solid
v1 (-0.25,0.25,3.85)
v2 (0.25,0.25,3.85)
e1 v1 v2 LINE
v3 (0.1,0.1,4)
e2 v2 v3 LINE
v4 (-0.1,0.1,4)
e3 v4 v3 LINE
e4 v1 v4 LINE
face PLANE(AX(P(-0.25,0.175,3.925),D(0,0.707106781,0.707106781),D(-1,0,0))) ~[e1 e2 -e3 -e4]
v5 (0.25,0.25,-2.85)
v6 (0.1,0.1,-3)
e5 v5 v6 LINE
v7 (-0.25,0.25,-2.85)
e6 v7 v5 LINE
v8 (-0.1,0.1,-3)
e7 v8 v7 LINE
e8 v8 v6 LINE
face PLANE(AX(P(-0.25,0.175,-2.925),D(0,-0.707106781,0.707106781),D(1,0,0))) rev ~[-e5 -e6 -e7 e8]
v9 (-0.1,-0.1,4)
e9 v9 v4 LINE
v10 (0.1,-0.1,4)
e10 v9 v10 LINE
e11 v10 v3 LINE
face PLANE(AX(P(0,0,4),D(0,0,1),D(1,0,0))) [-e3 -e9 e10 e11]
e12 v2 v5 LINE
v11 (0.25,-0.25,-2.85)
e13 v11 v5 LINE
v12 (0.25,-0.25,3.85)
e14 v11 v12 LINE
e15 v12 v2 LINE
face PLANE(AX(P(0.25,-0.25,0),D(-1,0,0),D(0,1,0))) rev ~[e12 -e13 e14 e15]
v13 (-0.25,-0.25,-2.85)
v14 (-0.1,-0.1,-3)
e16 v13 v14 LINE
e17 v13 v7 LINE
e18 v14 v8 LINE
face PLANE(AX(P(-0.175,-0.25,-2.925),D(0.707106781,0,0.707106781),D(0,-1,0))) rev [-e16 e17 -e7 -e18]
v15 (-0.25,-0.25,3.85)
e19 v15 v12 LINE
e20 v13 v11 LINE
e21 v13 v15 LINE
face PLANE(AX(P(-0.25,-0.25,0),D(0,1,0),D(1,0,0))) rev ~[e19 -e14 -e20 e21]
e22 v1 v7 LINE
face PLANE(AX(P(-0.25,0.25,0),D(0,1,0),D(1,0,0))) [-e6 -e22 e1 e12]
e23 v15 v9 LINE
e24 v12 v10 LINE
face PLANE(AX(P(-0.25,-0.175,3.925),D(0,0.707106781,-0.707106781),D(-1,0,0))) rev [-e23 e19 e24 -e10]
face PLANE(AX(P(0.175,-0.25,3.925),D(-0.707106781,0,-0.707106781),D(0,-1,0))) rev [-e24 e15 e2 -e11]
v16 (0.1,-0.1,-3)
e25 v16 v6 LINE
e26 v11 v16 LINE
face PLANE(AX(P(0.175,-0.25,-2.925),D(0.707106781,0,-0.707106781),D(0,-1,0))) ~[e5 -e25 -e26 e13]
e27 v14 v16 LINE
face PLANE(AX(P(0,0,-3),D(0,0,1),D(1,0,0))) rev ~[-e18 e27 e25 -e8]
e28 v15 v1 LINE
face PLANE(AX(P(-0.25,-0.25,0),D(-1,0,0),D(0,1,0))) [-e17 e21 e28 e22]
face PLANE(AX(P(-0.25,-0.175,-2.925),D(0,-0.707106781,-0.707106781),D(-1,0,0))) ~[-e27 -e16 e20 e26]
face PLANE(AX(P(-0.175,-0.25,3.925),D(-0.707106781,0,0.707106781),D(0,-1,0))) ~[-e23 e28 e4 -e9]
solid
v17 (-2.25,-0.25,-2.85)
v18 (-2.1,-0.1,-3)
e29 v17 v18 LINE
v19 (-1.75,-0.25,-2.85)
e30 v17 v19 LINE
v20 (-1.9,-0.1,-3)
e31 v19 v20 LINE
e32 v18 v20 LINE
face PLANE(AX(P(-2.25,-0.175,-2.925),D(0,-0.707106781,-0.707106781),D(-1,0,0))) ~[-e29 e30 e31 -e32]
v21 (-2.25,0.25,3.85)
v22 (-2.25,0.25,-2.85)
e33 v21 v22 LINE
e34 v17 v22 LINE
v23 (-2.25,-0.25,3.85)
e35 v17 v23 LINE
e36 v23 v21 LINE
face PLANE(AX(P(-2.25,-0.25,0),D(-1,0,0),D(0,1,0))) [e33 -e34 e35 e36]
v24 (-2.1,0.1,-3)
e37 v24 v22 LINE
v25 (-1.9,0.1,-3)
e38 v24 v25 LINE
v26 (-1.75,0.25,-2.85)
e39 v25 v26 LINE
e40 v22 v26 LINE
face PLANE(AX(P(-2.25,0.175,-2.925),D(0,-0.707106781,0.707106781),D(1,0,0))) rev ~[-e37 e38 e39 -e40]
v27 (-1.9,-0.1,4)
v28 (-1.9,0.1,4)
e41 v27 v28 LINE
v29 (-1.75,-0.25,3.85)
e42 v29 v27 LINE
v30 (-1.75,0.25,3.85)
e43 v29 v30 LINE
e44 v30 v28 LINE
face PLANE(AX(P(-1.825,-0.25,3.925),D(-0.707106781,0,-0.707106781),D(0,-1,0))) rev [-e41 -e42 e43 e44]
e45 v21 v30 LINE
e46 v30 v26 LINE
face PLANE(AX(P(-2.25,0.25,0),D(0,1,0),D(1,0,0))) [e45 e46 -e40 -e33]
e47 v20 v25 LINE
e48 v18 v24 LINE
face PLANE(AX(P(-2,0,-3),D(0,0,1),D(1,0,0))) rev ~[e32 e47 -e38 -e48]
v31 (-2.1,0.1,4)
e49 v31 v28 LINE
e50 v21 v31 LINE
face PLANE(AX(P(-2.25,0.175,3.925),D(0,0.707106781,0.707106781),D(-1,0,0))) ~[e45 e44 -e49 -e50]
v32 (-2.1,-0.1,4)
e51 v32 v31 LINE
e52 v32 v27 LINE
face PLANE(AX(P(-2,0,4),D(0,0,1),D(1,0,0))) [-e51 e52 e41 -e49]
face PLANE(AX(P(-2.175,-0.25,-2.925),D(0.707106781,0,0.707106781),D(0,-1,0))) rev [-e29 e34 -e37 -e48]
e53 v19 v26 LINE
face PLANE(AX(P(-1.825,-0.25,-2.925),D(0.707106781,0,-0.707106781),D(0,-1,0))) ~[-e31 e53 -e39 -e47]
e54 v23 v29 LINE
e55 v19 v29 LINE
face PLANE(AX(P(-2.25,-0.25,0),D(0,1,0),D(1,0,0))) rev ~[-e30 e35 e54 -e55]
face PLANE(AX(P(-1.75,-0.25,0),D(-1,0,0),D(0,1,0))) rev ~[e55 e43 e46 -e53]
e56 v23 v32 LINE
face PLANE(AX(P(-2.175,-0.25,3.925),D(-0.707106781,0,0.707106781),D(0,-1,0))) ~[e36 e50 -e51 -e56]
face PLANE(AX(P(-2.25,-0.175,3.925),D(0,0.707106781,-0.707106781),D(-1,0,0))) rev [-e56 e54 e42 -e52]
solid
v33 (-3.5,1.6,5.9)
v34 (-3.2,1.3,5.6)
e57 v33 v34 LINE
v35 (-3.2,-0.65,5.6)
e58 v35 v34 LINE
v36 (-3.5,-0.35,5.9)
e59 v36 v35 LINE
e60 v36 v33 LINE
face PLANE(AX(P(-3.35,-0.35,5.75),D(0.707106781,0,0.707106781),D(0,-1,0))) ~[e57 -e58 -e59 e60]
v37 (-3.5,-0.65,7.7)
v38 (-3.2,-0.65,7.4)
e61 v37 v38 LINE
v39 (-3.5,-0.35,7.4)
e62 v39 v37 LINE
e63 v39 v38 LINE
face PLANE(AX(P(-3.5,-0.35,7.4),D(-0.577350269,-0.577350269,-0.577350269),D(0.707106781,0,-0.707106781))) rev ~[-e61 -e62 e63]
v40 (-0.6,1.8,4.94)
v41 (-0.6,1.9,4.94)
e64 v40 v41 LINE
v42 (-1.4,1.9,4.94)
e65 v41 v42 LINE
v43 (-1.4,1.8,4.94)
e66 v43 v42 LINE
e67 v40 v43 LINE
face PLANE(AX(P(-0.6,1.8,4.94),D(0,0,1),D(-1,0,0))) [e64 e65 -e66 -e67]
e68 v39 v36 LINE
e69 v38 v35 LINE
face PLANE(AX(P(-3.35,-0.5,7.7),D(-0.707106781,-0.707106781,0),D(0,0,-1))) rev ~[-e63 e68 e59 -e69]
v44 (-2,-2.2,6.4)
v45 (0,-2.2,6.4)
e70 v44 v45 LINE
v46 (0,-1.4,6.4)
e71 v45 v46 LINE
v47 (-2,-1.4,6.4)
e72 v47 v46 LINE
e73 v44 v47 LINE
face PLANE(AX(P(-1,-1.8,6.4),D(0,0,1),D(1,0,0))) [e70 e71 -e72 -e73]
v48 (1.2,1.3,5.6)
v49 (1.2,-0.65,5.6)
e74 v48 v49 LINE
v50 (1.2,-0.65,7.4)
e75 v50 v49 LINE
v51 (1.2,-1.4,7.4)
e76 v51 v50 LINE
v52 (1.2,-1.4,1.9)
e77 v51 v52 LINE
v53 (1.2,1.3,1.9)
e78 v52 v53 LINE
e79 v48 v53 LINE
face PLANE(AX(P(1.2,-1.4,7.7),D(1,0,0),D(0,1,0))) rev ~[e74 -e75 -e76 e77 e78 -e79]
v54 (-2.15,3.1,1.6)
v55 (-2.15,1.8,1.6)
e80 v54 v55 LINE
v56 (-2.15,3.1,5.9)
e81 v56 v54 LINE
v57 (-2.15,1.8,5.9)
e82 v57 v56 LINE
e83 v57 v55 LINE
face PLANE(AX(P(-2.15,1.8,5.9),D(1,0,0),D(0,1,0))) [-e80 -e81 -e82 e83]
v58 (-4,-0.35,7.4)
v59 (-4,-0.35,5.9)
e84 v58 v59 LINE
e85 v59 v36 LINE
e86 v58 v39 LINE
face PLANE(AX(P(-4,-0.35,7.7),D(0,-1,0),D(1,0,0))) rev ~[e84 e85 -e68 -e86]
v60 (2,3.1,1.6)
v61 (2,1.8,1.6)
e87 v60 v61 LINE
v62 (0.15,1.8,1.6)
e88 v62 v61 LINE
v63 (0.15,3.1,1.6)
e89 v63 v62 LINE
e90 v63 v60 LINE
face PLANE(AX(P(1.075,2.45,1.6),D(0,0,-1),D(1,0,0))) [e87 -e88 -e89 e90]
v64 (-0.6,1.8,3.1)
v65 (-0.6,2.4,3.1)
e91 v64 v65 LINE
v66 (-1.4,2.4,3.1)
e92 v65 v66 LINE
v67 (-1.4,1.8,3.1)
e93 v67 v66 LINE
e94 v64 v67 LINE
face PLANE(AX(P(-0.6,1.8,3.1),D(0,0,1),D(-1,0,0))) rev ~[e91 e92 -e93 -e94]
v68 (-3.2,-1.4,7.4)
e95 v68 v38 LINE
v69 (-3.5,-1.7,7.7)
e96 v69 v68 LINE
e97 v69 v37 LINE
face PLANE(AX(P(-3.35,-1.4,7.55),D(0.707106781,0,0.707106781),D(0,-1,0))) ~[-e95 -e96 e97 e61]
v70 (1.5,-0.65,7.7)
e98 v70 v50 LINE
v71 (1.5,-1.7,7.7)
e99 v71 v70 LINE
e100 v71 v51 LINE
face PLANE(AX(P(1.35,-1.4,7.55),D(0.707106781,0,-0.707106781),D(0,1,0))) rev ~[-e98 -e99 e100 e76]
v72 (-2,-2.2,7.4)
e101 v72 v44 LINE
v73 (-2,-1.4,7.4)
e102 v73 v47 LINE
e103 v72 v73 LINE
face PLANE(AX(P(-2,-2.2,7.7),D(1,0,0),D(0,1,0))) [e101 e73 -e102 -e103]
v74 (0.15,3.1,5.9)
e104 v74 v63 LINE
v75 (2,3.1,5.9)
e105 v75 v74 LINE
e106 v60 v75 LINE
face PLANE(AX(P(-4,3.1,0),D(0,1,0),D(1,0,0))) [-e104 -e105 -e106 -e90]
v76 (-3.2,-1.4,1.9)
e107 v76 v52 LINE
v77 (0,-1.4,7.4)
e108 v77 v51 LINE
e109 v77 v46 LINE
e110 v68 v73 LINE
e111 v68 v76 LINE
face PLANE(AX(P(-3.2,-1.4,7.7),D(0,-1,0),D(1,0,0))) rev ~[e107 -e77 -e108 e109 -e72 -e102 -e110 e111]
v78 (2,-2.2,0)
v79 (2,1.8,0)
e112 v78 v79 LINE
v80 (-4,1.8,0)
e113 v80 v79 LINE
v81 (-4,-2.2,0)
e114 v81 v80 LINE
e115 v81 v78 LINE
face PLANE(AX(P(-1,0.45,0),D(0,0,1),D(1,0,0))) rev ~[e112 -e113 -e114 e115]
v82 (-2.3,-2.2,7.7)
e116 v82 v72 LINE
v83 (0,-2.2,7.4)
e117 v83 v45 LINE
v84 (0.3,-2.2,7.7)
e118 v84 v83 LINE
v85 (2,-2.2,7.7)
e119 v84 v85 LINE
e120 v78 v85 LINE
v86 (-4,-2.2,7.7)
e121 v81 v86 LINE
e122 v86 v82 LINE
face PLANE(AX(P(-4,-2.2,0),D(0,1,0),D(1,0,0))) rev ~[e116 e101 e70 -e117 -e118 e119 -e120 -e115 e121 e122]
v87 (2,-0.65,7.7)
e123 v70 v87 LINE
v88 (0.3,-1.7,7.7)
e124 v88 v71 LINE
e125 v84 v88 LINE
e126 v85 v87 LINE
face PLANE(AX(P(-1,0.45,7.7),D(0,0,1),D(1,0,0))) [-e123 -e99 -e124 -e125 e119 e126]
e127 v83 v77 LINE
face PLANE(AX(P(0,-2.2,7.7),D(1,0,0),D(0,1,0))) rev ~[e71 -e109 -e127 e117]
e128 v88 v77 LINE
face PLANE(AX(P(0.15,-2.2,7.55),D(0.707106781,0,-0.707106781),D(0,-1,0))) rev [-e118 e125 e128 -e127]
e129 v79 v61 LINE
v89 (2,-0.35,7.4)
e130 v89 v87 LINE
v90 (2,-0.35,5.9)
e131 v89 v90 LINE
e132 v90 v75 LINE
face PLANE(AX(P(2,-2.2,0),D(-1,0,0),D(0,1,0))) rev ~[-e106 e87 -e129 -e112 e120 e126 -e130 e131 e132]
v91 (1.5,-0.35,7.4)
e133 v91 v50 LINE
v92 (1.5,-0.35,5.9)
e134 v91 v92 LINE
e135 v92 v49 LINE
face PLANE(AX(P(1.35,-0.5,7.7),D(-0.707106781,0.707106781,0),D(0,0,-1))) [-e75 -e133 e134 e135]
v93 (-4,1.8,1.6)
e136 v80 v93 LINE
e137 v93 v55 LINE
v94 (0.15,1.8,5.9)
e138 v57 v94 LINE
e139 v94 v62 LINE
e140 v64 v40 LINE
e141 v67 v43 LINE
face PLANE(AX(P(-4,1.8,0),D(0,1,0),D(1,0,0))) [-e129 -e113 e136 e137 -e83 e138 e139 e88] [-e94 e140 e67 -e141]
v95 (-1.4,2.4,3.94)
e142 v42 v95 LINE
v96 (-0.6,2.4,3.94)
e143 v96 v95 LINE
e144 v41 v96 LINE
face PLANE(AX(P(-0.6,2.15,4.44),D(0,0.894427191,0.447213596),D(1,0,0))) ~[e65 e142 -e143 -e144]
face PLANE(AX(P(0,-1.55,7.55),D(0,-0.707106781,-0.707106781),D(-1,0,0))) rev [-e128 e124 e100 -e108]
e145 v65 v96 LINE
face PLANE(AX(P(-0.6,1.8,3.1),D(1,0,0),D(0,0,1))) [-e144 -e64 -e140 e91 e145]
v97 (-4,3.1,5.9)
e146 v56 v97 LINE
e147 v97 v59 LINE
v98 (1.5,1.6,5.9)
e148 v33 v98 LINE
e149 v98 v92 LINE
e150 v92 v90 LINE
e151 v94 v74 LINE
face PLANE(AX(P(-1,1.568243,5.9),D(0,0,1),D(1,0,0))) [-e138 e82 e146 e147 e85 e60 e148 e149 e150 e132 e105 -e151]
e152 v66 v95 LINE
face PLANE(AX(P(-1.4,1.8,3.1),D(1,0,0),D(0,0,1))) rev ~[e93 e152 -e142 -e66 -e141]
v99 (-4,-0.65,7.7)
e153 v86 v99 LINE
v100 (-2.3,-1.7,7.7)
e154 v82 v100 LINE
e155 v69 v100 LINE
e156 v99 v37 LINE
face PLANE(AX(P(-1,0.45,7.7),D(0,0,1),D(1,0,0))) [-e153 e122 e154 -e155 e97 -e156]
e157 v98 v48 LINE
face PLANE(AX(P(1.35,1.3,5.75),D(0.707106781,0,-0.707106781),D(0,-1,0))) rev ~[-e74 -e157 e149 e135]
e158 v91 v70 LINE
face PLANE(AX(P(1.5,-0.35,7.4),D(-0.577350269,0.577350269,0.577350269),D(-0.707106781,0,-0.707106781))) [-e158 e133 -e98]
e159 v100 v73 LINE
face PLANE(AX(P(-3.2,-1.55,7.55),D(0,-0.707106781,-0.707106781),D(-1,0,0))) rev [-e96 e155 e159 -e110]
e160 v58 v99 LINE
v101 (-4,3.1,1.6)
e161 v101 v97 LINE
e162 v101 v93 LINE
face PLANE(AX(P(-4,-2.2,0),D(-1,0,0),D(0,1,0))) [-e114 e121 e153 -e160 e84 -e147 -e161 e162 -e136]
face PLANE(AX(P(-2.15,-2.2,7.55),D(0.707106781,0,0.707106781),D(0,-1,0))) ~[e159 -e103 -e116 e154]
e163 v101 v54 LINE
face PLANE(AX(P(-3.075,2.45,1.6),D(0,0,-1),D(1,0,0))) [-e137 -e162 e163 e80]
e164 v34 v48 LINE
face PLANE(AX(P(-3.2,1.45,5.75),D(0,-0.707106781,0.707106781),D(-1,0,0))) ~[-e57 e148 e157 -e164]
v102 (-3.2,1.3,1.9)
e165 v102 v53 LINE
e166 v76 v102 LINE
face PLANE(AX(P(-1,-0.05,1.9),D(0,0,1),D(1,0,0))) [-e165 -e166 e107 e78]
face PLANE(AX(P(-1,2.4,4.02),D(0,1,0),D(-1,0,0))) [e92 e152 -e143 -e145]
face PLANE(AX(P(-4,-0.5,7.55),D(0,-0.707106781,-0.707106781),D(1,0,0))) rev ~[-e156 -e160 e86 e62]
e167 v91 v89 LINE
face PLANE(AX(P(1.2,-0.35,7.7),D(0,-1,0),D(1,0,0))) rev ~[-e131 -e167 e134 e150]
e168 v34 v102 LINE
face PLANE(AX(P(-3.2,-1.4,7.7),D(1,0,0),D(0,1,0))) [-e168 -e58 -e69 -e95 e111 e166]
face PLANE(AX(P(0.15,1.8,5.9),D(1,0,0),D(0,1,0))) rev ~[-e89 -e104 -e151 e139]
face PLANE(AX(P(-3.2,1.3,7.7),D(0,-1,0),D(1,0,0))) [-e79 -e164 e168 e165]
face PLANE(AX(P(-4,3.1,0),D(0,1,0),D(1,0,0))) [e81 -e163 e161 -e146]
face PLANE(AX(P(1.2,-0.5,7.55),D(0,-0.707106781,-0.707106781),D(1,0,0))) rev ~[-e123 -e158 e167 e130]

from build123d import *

# Parameters (mm, degrees)
F0_W          = 0.5
F0_H          = 0.5
F1_DEPTH      = 3
F1_DEPTH_BACK = 4
F2_W          = 6
F2_H          = 5.3
F3_DEPTH      = 7.7
F4_W          = 4.4
F4_H          = 2.7
F5_DEPTH      = 5.8
F6_W          = 2
F6_H          = 0.8
F7_DEPTH      = 1.3
F8_DEPTH      = 1.8
F9_W          = 2.3
F9_H          = 1.3
F10_DEPTH     = 25
F11_W         = 0.8
F11_H         = 1.84
F12_DEPTH     = 0.6
F13_W         = 1.85
F13_H         = 1.3
F14_DEPTH     = 1.6
F15_SIZE2     = 1
F15_SIZE      = 0.5
F16_SIZE      = 0.3
F17_SIZE      = 0.15
F17_2_SIZE    = 0.15


with BuildPart() as f1:
    # F0 (on Top) → F1 (new body, two sides)
    with BuildSketch(Plane.XY) as f1_sk:
        with Locations((-2, 0)):
            Rectangle(F0_W, F0_H)
    extrude(amount=-F1_DEPTH)
    extrude(f1_sk.sketch, amount=F1_DEPTH_BACK)

    # F17
    f17_edges = [f1.edges().sort_by_distance(p)[0] for p in [
        (-2, 0.25, 4),
        (-2.25, 0, 4),
        (-2, -0.25, 4),
        (-1.75, 0, 4),
        (-2, 0.25, -3),
        (-2.25, 0, -3),
        (-2, -0.25, -3),
        (-1.75, 0, -3),
    ]]
    chamfer(f17_edges, length=F17_SIZE)


with BuildPart() as f1b:
    # F0 (on Top) → F1, piece 2 (new body, two sides)
    with BuildSketch(Plane.XY) as f1_2_sk:
        Rectangle(F0_W, F0_H)
    extrude(amount=-F1_DEPTH)
    extrude(f1_2_sk.sketch, amount=F1_DEPTH_BACK)

    # F17#2
    f17_2_edges = [f1b.edges().sort_by_distance(p)[0] for p in [
        (0.25, 0, 4),
        (0, 0.25, 4),
        (-0.25, 0, 4),
        (0, -0.25, 4),
        (0.25, 0, -3),
        (0, 0.25, -3),
        (-0.25, 0, -3),
        (0, -0.25, -3),
    ]]
    chamfer(f17_2_edges, length=F17_2_SIZE)


with BuildPart() as f3:
    # F2 (on Top) → F3 (new body)
    with BuildSketch(Plane.XY):
        with Locations((-1, 0.45)):
            Rectangle(F2_W, F2_H)
    extrude(amount=F3_DEPTH)

    # F4 (on face) → F5 (cut)
    with BuildSketch(Plane.XY.offset(7.7)):
        with Locations((-1, -0.05)):
            Rectangle(F4_W, F4_H)
    extrude(amount=-F5_DEPTH, mode=Mode.SUBTRACT)

    # F6 (on face) → F7 (cut)
    with BuildSketch(Plane.XY.offset(7.7)):
        with Locations((-1, -1.8)):
            Rectangle(F6_W, F6_H)
    extrude(amount=-F7_DEPTH, mode=Mode.SUBTRACT)

    # F6 (on face) → F8 (cut)
    with BuildSketch(Plane.XY.offset(7.7)):
        Polygon((-4, 3.1), (-4, -0.35), (-3.2, -0.35), (-3.2, 1.3), (1.2, 1.3), (1.2, -0.35), (2, -0.35), (2, 3.1), align=None)
    extrude(amount=-F8_DEPTH, mode=Mode.SUBTRACT)

    # F9 (on face) → F10 (cut)
    with BuildSketch(Plane.XY.offset(5.9)):
        with Locations((-1, 2.45)):
            Rectangle(F9_W, F9_H)
    extrude(amount=-F10_DEPTH, mode=Mode.SUBTRACT)

    # F11 (on face) → F12 (join)
    with BuildSketch(Plane(origin=(0, 1.8, 0), x_dir=(-1, 0, 0), z_dir=(0, 1, 0))):
        with Locations((1, 4.02)):
            Rectangle(F11_W, F11_H)
    extrude(amount=F12_DEPTH)

    # F13 (on face) → F14 (cut)
    with BuildSketch(Plane(origin=(0, 0, 0), x_dir=(1, 0, 0), z_dir=(0, 0, -1))):
        with Locations((-3.075, -2.45)):
            Rectangle(F13_W, F13_H)
        with Locations((1.075, -2.45)):
            Rectangle(F13_W, F13_H)
    extrude(amount=-F14_DEPTH, mode=Mode.SUBTRACT)

    # F15
    f15_edges = [f3.edges().sort_by_distance(p)[0] for p in [
        (-1, 2.4, 4.94),
    ]]
    f15_side = f3.faces().sort_by_distance((-1, 2.1, 4.94))[0]
    chamfer(f15_edges, length=F15_SIZE, length2=F15_SIZE2, reference=f15_side)

    # F16
    f16_edges = [f3.edges().sort_by_distance(p)[0] for p in [
        (-2.6, -1.4, 7.7),
        (-3.2, -0.875, 7.7),
        (0.6, -1.4, 7.7),
        (1.2, -0.875, 7.7),
        (-2, -1.8, 7.7),
        (0, -1.8, 7.7),
        (-3.6, -0.35, 7.7),
        (1.6, -0.35, 7.7),
        (1.2, -0.35, 6.8),
        (1.2, 0.475, 5.9),
        (-1, 1.3, 5.9),
        (-3.2, 0.475, 5.9),
        (-3.2, -0.35, 6.8),
    ]]
    chamfer(f16_edges, length=F16_SIZE)


solid = Compound([f1.part, f1b.part, f3.part])
